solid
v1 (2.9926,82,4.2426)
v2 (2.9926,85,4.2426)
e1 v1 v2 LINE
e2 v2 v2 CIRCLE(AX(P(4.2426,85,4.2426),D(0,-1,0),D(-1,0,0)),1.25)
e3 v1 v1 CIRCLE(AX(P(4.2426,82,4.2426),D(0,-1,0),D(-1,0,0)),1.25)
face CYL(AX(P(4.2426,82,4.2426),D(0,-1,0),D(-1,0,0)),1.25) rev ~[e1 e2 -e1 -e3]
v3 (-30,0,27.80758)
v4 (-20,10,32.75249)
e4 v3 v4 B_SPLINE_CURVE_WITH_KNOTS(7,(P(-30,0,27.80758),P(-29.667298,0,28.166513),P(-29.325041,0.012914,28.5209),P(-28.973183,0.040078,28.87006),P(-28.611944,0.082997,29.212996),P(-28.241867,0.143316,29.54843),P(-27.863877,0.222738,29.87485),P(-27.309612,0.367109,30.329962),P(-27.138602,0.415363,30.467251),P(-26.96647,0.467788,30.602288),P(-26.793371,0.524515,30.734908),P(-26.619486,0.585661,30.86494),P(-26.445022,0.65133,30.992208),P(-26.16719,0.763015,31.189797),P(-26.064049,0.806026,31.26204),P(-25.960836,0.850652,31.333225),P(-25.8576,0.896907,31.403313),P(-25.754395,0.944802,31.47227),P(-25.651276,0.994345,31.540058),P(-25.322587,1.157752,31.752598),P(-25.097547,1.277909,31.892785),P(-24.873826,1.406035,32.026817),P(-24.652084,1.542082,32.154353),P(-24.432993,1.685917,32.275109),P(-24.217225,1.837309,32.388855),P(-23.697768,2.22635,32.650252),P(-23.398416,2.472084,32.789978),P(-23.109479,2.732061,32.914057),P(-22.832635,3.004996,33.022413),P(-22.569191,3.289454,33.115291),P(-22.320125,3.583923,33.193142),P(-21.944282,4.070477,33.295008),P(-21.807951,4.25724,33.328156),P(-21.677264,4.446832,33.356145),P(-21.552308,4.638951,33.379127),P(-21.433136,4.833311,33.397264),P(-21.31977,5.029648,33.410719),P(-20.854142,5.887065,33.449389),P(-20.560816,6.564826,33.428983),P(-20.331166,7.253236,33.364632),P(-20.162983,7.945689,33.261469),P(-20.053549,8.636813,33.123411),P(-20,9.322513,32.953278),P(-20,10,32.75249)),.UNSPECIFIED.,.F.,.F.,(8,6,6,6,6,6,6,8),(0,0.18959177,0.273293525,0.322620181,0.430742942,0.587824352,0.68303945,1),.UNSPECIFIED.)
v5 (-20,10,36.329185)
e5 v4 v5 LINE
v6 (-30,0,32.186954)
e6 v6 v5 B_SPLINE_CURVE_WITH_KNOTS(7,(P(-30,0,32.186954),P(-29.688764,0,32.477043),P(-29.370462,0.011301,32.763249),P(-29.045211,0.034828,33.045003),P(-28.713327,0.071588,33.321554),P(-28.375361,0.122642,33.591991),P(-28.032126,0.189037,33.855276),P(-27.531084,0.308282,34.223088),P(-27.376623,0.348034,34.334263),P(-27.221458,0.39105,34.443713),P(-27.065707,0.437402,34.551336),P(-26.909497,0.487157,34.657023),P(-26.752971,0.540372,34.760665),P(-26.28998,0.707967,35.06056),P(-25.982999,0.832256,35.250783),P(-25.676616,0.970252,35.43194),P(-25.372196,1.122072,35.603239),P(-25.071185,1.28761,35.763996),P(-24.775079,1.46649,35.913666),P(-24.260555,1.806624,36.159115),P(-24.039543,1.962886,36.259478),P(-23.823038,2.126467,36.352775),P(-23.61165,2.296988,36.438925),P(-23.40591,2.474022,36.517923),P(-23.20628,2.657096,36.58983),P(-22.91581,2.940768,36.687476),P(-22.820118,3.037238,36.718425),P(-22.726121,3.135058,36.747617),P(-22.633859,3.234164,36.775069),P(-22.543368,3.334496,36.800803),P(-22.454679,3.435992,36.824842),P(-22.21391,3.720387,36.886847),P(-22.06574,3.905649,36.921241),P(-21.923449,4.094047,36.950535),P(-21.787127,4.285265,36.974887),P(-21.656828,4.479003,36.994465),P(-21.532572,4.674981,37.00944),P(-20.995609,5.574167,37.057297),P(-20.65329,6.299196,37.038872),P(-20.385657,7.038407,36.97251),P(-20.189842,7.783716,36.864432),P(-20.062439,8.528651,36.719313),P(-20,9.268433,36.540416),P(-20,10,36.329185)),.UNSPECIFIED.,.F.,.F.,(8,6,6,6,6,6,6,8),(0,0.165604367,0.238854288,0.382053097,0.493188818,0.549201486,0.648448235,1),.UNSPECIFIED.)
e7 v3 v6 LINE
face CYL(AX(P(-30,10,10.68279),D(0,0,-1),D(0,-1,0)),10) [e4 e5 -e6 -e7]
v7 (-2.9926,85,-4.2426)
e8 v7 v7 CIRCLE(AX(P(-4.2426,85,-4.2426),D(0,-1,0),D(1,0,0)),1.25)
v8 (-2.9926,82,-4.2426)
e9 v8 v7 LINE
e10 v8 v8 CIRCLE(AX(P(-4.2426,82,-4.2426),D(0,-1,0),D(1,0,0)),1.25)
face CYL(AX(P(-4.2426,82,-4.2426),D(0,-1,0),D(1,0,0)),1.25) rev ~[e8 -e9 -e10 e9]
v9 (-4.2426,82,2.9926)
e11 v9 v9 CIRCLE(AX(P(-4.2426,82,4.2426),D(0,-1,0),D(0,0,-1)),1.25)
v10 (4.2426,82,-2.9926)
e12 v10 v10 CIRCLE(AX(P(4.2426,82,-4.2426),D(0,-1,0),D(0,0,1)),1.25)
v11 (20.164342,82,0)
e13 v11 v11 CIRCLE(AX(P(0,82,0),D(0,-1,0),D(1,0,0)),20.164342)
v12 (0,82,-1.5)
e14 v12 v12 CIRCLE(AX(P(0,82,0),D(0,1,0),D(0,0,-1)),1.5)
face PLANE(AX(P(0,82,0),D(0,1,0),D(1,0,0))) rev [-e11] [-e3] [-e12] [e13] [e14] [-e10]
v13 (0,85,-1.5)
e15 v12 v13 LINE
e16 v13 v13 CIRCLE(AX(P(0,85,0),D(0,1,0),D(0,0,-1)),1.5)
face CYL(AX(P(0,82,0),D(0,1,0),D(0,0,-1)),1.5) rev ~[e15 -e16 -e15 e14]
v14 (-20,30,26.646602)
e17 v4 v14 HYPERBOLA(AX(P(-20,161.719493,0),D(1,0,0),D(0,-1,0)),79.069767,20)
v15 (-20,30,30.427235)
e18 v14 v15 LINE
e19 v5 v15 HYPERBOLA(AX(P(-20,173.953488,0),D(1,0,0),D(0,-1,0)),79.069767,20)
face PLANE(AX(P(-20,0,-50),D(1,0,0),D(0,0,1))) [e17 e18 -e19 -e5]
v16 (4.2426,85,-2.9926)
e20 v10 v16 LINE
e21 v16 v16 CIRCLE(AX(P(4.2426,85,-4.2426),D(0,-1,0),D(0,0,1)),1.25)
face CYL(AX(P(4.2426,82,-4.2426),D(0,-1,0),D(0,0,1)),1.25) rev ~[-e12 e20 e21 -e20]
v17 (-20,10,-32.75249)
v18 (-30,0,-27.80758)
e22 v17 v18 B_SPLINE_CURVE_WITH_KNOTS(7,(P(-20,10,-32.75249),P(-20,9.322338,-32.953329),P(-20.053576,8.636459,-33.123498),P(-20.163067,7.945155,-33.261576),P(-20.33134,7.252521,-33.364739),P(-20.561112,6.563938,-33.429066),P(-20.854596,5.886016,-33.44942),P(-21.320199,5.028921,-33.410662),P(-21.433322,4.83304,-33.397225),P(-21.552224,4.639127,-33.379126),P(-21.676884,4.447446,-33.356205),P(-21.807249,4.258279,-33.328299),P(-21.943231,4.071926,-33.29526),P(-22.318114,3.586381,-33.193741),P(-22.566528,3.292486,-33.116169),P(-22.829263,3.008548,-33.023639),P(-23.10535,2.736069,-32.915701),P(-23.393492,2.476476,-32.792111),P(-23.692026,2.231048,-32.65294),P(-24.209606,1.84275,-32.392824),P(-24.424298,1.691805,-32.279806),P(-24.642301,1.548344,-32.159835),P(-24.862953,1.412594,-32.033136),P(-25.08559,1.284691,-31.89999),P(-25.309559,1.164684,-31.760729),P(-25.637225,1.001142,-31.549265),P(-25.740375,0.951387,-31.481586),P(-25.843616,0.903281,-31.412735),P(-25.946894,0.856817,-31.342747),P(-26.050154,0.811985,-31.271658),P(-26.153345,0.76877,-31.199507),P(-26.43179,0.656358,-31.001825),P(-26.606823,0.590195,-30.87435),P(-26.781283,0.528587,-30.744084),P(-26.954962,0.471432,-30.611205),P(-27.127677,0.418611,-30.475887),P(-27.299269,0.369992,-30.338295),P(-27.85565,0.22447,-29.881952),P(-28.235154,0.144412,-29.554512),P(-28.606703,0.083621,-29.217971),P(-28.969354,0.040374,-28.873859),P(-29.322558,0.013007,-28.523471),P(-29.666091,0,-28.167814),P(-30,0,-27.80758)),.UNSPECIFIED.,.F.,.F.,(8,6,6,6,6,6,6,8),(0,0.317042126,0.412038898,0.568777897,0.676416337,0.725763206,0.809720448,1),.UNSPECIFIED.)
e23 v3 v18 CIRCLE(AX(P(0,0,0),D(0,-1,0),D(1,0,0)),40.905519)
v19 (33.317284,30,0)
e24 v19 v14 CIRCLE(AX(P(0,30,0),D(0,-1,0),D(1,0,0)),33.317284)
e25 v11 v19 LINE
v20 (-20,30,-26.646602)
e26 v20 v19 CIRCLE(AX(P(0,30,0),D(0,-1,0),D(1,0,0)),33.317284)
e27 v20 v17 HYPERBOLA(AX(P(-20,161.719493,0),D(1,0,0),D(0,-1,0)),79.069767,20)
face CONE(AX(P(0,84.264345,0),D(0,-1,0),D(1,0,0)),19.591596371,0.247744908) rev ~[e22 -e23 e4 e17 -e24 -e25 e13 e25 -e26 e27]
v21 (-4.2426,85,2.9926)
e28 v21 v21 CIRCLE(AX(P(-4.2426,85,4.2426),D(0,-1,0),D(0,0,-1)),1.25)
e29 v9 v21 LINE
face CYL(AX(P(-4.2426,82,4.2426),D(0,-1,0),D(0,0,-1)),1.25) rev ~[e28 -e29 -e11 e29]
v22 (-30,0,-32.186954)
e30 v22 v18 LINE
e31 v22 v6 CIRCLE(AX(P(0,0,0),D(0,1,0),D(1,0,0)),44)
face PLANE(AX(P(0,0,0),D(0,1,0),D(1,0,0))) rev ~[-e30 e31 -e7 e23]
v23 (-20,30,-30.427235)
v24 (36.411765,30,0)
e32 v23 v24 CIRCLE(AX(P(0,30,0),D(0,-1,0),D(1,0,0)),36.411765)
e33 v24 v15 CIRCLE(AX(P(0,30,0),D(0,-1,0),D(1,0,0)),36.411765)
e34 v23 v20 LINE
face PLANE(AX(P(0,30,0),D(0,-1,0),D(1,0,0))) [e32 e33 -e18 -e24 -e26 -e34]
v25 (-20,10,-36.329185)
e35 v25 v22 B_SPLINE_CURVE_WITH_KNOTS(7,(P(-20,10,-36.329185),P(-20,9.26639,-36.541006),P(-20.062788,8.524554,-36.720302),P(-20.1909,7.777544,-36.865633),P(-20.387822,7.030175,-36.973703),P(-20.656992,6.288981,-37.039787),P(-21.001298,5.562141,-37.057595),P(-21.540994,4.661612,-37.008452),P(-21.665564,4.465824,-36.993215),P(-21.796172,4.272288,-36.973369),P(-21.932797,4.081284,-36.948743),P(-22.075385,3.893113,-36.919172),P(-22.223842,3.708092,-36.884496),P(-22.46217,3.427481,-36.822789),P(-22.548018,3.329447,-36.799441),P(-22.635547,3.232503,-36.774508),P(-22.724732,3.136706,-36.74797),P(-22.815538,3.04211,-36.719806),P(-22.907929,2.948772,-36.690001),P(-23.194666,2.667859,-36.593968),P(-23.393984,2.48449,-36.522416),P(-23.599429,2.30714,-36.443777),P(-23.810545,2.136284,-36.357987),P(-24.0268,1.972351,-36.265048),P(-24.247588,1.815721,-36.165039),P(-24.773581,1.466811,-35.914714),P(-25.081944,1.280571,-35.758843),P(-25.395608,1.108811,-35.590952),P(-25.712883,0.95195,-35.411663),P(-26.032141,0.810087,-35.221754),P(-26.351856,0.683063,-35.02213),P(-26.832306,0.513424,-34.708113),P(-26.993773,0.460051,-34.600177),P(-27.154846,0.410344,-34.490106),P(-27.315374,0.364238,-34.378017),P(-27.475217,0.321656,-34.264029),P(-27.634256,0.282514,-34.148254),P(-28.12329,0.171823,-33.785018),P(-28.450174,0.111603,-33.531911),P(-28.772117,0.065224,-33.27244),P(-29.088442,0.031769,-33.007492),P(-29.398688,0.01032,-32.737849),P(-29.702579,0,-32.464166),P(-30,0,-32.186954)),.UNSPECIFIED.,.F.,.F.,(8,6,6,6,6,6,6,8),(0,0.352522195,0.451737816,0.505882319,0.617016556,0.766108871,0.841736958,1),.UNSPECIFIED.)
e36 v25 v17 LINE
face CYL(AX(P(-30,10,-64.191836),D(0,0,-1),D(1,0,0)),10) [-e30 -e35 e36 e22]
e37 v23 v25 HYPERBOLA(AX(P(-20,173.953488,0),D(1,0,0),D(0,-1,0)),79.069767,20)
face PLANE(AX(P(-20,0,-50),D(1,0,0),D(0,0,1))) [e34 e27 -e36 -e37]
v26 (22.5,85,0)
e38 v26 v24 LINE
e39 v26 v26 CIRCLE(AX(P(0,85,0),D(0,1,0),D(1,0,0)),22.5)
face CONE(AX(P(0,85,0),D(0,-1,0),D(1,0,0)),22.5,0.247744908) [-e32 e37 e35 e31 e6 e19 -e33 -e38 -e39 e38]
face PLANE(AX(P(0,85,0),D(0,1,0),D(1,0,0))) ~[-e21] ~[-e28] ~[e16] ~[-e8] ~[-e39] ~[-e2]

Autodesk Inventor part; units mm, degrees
ref_plane "YZ Plane" through (0, 0, 0) normal (1, 0, 0) x (0, 1, 0)
ref_plane "XZ Plane" through (0, 0, 0) normal (0, 1, 0) x (-1, 0, 0)
ref_plane "XY Plane" through (0, 0, 0) normal (0, 0, 1) x (1, 0, 0)
sketch "スケッチ8" plane through (0, 0, 0) normal (0, 0, 1) x (1, 0, 0)
  line L0 (0, 0) -> (0, 85)
  line L1 (0, 85) -> (22.5, 85)
  line L2 (22.5, 85) -> (44, 0)
  line L3 (44, 0) -> (0, 0)
  dimension "d14" = 22.5
  dimension "d15" = 44
  dimension "d16" = 85
revolve "回転1" add sketch "スケッチ8" angle 360 about axis through (0, 0, 0) along (0, 1, 0)
shell "シェル2" thickness 3 removed faces 1 at (-13.3987, 0, -0.1333)
sketch "スケッチ9" plane through (0, 82, 0) normal (0, -1, 0) x (1, 0, 0)
  circle A0 centre (0, 0) radius 1.5
  dimension "d29" = 3
hole "穴2" at (0, 82, 0) direction (0, 1, 0) diameter 3 end through all
sketch "スケッチ16" plane through (0, 0, 0) normal (0, -1, 0) x (1, 0, 0)
  line L0 (80, -50) -> (-20, -50)
  line L1 (-20, -50) -> (-20, 50)
  line L2 (-20, 50) -> (80, 50)
  line L3 (80, 50) -> (80, -50)
  point P0 (0, 0)
  dimension "d66" = 100
  dimension "d67" = 100
  dimension "d68" = 50
  dimension "d69" = 20
extrude "押し出し6" cut sketch "スケッチ16" against normal blind 30
fillet "フィレット3" radius 10 2 edges at (-20, 0, -37.4373) (-20, 0, 37.4373)
sketch "スケッチ17" plane through (0, 82, 0) normal (0, -1, 0) x (1, 0, 0)
  line L0 (0, 0) -> (-4.2426, -4.2426)
  line L1 (0, 0) -> (6, 0) construction
  circle A0 centre (-4.2426, -4.2426) radius 1.25
  dimension "d73" = 6
  dimension "d74" = 135
  dimension "d75" = 2.5
extrude "押し出し7" cut sketch "スケッチ17" against normal blind 30
pattern_circular "円形状パターン2" count 4 over 360 about axis through (0, 232.7083, 0) along (0, -1, 0) of "押し出し7"
properties part number "ball受け" material "ABS プラスチック"
